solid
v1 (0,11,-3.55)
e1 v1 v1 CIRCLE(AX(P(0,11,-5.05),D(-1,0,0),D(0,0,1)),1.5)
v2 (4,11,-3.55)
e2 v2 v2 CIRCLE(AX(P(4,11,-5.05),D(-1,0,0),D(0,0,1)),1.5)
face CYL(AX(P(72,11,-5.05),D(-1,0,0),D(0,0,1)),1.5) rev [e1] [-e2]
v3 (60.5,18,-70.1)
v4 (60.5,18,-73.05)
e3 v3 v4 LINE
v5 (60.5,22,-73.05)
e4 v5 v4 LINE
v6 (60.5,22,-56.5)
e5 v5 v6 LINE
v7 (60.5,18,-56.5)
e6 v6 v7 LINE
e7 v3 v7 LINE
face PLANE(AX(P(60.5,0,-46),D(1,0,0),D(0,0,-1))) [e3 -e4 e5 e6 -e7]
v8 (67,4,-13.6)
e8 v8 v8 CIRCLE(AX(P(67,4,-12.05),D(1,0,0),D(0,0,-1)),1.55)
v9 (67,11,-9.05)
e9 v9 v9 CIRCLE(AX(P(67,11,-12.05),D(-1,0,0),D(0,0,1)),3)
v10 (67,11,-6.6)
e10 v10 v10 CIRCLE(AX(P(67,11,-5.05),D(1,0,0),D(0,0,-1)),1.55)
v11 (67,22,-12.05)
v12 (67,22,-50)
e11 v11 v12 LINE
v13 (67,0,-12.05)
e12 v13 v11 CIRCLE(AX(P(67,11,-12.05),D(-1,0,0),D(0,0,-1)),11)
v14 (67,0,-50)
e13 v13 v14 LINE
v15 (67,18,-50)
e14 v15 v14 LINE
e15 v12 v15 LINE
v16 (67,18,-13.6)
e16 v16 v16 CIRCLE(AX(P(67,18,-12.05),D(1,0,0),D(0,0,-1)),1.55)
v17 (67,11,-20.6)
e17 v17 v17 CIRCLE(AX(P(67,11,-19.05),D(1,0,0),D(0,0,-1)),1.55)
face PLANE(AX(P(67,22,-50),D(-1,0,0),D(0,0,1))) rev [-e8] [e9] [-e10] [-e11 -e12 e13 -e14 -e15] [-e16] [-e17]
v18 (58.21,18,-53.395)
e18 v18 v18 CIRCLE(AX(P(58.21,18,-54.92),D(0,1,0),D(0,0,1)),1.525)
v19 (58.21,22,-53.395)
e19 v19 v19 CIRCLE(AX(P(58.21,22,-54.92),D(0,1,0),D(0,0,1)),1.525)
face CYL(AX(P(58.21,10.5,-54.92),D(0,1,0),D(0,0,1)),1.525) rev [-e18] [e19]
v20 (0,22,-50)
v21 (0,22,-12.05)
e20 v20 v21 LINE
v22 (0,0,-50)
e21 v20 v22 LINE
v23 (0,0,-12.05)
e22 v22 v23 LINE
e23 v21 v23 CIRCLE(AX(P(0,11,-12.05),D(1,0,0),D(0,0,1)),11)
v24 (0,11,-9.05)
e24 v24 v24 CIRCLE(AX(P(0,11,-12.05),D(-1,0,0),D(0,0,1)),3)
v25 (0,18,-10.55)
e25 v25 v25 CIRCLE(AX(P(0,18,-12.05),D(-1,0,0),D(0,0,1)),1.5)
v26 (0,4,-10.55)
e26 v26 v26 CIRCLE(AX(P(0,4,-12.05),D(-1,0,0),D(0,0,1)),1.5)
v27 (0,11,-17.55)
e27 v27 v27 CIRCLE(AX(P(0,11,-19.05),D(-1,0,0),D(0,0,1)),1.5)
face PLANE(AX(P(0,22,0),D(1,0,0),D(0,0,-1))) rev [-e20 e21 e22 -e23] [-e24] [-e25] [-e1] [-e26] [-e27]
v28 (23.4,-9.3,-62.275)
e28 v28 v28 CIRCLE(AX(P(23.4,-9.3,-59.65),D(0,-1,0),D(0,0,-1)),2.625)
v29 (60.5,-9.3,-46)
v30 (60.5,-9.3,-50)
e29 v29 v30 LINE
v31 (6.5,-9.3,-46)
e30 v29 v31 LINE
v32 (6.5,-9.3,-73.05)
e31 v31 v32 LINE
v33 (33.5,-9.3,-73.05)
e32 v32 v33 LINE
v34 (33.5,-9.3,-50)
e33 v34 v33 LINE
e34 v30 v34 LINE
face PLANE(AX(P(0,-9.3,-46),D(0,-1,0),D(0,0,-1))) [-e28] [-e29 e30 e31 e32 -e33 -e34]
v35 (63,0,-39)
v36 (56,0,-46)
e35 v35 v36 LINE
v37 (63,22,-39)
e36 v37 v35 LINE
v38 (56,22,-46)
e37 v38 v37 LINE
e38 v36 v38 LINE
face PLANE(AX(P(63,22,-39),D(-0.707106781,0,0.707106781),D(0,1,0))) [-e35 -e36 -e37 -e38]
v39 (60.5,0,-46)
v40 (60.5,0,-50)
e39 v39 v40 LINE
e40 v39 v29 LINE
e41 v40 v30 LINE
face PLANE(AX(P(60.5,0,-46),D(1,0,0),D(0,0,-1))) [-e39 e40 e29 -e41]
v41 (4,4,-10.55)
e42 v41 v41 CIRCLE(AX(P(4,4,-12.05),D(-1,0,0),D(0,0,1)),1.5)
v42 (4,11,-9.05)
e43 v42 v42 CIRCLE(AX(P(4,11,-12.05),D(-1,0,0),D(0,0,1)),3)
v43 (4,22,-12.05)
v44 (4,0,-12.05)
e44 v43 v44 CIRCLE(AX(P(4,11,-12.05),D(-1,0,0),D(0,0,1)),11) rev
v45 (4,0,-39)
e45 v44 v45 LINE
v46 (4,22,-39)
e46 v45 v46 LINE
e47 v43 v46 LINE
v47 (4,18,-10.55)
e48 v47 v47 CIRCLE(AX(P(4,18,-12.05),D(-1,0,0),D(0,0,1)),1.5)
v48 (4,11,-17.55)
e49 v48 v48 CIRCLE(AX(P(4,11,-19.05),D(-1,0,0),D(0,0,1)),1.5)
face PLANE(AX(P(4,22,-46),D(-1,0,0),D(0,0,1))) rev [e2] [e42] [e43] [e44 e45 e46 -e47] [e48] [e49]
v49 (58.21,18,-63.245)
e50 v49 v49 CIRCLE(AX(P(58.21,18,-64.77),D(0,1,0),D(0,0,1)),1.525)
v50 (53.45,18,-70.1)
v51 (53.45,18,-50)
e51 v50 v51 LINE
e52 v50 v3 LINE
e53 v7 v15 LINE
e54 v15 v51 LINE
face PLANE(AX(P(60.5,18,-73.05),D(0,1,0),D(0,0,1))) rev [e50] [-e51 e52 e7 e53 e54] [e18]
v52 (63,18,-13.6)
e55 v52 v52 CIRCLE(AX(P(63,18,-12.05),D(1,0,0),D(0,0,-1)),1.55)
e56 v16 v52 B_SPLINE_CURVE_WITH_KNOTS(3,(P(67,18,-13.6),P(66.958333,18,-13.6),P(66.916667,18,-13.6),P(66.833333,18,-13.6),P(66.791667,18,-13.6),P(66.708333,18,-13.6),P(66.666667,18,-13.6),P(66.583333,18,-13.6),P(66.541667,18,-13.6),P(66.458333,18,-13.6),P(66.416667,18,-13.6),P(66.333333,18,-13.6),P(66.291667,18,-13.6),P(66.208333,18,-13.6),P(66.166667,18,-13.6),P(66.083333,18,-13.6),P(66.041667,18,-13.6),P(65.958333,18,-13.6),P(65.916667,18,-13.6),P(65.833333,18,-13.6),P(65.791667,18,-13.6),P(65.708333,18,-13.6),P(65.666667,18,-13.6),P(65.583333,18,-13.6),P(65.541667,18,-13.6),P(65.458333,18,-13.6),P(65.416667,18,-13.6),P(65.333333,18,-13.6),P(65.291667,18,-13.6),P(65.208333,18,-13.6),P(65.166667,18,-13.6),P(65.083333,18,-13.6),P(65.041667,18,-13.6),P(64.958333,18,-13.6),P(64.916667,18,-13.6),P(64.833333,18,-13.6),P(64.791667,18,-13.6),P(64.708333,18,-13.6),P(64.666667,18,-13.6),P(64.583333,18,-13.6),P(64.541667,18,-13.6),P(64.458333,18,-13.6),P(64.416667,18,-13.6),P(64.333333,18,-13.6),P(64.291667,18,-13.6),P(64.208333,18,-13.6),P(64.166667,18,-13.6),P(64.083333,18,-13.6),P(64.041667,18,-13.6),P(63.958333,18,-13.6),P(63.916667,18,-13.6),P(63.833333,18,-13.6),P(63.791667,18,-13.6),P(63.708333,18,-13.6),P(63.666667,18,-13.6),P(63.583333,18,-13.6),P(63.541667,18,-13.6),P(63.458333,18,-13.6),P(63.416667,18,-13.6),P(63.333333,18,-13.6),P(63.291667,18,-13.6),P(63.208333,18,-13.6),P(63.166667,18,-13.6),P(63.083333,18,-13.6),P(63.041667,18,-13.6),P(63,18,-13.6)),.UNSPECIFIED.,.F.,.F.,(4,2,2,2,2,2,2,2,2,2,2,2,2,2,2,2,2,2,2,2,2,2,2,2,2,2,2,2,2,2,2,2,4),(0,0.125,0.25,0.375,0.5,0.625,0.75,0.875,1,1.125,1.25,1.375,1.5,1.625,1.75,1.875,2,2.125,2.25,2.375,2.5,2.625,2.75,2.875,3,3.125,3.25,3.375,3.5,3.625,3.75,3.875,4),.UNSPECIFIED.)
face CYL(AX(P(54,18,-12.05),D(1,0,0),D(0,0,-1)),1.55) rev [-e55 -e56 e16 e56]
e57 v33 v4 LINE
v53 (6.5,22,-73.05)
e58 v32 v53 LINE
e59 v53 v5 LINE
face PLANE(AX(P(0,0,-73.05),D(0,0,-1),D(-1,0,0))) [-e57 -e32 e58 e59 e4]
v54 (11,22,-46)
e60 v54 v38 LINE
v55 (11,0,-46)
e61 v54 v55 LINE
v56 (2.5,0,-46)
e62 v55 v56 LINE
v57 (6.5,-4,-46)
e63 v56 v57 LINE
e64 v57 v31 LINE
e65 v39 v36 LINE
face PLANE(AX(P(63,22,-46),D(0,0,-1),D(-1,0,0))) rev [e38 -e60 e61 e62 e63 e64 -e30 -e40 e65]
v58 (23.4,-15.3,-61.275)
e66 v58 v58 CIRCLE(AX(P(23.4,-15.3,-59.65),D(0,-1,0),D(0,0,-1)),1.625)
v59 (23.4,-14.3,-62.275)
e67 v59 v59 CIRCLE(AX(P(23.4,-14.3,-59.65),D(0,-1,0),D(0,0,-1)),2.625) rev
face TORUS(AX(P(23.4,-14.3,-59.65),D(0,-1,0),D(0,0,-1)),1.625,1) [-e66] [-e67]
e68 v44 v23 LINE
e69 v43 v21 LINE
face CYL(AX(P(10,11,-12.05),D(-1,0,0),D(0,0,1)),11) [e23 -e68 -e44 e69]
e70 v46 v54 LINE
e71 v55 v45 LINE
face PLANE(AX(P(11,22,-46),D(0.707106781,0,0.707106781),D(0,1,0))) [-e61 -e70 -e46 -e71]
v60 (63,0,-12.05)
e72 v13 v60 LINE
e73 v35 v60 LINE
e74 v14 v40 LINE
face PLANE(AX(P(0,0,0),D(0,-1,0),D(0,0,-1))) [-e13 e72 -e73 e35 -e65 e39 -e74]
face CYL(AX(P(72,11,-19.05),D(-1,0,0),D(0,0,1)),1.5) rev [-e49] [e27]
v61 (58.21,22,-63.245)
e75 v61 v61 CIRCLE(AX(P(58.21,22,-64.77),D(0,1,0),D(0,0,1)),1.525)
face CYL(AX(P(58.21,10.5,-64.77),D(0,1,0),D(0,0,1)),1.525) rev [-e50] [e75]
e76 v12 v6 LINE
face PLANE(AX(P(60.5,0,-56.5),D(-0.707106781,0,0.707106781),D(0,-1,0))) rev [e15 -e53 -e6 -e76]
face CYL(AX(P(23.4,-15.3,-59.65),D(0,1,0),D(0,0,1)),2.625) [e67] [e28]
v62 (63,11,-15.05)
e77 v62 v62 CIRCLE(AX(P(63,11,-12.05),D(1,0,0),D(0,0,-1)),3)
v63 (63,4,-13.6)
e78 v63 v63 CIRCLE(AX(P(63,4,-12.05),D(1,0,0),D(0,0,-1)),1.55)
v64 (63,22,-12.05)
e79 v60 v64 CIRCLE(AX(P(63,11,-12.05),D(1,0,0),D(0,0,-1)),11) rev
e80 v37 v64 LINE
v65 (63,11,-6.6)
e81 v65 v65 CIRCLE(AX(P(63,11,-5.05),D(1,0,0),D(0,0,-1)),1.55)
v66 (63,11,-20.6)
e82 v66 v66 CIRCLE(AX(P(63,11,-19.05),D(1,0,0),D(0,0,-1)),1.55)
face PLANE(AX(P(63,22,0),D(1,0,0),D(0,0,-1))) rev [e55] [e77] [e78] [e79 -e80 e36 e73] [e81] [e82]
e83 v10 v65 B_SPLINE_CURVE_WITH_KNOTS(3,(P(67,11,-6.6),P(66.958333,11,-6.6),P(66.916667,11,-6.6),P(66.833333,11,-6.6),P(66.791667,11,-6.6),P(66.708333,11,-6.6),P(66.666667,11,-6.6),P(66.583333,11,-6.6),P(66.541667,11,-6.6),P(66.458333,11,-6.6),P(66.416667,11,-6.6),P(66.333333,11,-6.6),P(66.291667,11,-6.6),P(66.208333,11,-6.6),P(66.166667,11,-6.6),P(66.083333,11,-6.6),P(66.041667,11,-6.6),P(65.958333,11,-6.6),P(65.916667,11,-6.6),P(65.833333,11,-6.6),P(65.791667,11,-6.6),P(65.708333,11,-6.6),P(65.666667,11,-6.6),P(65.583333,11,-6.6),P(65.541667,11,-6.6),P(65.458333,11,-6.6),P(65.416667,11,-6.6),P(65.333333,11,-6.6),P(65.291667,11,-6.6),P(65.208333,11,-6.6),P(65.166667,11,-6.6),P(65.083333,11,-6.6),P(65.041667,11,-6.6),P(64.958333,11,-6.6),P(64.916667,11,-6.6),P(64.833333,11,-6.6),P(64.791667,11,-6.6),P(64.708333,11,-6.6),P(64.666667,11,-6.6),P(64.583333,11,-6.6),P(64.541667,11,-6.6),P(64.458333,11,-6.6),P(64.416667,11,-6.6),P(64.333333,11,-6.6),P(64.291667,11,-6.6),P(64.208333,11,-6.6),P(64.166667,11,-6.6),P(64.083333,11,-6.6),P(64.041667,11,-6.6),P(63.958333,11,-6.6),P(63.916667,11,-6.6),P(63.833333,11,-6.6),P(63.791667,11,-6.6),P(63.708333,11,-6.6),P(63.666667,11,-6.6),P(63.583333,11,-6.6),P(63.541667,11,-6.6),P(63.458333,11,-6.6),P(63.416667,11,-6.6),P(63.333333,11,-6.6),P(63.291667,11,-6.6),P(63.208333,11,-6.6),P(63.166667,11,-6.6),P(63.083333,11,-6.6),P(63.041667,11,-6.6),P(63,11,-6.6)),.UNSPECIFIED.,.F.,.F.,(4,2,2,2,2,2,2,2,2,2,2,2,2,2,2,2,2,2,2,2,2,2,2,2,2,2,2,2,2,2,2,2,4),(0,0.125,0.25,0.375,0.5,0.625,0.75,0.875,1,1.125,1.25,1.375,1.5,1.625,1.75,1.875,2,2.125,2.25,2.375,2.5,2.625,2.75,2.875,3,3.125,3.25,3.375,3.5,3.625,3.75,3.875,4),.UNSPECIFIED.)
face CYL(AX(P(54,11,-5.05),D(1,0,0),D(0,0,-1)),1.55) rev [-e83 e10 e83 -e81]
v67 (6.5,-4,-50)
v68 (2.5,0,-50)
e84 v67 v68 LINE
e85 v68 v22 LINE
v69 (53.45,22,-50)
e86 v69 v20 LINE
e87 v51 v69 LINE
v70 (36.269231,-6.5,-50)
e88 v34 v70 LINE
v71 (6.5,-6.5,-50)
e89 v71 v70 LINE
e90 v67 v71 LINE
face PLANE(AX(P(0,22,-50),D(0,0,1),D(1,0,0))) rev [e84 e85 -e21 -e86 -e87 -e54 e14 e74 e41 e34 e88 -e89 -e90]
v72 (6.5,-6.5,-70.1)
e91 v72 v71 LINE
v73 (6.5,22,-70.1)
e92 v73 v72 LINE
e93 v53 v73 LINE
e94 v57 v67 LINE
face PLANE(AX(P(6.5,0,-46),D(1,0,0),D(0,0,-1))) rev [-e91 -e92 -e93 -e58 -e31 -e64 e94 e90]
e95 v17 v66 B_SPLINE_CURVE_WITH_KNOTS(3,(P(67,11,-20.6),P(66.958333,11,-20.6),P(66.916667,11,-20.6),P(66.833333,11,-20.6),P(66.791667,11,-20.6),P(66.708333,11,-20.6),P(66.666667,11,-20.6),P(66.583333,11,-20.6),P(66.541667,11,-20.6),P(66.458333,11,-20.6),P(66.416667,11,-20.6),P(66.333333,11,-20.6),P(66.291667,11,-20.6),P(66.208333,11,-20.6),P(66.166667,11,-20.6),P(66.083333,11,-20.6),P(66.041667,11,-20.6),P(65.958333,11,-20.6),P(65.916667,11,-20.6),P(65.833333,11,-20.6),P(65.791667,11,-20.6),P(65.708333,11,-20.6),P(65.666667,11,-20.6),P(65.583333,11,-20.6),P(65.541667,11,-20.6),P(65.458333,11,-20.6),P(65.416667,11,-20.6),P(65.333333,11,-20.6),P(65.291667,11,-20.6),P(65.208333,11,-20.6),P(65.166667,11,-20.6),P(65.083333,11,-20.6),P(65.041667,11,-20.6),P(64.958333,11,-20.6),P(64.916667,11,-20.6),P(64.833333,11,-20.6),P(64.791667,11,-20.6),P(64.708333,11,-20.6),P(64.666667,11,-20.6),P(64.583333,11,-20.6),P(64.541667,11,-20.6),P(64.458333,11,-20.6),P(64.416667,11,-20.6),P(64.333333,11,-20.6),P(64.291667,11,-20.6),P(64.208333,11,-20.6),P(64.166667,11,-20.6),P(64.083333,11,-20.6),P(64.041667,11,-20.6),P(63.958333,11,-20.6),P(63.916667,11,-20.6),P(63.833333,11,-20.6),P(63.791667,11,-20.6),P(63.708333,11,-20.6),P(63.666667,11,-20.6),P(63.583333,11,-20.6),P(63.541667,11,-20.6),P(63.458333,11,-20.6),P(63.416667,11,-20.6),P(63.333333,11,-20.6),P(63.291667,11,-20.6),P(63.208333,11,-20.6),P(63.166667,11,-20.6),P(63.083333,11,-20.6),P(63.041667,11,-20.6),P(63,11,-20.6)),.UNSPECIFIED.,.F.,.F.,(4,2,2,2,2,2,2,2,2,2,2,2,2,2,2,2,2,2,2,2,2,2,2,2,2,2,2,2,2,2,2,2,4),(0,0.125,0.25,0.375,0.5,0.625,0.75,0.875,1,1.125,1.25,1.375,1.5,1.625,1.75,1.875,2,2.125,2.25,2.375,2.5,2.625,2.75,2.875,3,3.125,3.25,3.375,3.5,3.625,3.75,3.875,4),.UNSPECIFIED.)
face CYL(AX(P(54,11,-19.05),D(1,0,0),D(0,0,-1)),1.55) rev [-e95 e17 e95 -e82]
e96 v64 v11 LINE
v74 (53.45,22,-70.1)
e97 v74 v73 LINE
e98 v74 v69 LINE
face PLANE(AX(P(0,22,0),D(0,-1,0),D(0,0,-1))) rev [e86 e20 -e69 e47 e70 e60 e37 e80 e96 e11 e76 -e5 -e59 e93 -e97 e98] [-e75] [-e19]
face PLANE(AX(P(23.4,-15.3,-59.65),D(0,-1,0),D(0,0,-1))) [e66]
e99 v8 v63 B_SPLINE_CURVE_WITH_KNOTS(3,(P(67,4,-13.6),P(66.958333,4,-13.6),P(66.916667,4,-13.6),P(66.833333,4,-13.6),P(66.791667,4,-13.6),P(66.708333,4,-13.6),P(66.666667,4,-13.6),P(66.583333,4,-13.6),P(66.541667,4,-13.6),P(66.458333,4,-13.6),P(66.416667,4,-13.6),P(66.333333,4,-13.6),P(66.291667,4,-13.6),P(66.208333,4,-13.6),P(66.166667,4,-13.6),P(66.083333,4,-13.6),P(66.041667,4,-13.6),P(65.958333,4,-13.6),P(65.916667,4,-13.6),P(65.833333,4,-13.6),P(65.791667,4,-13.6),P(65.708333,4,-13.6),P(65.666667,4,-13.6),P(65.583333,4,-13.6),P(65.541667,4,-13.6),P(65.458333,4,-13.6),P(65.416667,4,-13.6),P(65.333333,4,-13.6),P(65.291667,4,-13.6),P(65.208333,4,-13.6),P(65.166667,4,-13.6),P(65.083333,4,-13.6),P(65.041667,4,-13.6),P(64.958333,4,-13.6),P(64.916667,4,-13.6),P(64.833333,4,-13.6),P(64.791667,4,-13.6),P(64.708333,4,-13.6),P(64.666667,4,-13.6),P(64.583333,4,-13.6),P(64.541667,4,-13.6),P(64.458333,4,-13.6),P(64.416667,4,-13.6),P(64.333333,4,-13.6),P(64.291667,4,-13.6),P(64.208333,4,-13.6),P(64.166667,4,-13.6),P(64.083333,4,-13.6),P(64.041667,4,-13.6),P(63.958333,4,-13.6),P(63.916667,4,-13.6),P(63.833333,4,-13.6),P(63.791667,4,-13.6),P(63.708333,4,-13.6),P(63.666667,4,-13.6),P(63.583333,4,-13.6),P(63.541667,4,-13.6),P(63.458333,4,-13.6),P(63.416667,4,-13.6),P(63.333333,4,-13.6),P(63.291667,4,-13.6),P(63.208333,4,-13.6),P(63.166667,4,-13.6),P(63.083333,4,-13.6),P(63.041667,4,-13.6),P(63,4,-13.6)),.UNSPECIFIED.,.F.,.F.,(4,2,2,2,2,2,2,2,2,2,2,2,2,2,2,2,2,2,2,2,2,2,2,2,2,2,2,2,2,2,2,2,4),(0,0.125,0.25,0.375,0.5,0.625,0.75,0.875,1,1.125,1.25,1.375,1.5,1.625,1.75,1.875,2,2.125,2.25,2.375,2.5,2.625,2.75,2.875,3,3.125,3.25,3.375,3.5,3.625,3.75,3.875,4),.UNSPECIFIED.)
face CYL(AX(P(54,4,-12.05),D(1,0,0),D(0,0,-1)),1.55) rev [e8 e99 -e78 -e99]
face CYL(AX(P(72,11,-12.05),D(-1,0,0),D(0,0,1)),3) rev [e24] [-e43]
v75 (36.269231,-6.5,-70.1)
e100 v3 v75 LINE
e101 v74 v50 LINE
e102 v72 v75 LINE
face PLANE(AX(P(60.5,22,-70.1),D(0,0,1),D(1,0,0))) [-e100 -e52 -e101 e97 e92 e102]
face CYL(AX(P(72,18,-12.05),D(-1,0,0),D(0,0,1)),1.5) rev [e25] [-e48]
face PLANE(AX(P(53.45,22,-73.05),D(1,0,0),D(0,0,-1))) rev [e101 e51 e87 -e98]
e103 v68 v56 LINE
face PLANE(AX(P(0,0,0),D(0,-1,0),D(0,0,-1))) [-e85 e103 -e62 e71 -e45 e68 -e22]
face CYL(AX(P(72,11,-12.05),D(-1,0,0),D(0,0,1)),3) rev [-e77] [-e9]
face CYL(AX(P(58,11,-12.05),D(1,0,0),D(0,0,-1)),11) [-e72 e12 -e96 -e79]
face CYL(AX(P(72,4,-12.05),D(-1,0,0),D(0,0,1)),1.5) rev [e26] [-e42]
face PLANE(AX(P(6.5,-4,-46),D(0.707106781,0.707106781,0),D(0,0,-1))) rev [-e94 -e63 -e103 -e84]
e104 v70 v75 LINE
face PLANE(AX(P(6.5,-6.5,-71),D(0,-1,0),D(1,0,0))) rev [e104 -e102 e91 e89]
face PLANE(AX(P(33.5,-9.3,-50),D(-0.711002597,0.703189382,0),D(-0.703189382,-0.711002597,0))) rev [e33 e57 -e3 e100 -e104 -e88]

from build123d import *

# Parameters (mm, degrees)
BOSS_EXTRUDE1_DEPTH      = 22
SKETCH3_R                = 1.55
CUT_EXTRUDE1_DEPTH       = 30
CUT_EXTRUDE5_DEPTH       = 9
SKETCH11_R               = 1.55
CUT_EXTRUDE10_DEPTH      = 13
CUT_EXTRUDE11_START      = -10
CUT_EXTRUDE11_DEPTH      = 10
SKETCH13_R               = 3
SKETCH13_R_2             = 1.5
CUT_EXTRUDE12_DEPTH      = 72
FILLET1_SIZE             = 7
SKETCH14_W               = 54
SKETCH14_H               = 9.3
SKETCH14_W_2             = 7.05
SKETCH14_H_2             = 4
BOSS_EXTRUDE4_DEPTH      = 4
SKETCH17_W               = 7.05
SKETCH17_H               = 4
BOSS_EXTRUDE5_DEPTH      = 23.05
BOSS_EXTRUDE6_DEPTH      = 27.3
BOSS_EXTRUDE6_DEPTH_BACK = 4
SKETCH18_W               = 54
SKETCH18_H               = 2.95
SKETCH19_W               = 54
SKETCH19_H               = 2.8
BOSS_EXTRUDE7_DEPTH      = 21
FILLET2_SIZE             = 6.5
SKETCH20_R               = 2.625
BOSS_EXTRUDE8_DEPTH      = 6
FILLET4_R                = 1
CUT_EXTRUDE15_DEPTH      = 23.05
SKETCH23_W               = 18.360798368
SKETCH23_H               = 20.1
CUT_EXTRUDE16_DEPTH      = 23
FILLET7_SIZE             = 4
SKETCH26_R               = 1.525
CUT_EXTRUDE18_DEPTH      = 11.5


with BuildPart() as part:
    # Sketch1 → Boss-Extrude1 (new body)
    with BuildSketch(Plane(origin=(0, 0, 0), x_dir=(1, 0, 0), z_dir=(0, 1, 0))):
        Polygon((0, 0), (0, 50), (67, 50), (67, 0), (63, 0), (63, 46), (4, 46), (4, 0), align=None)
    extrude(amount=BOSS_EXTRUDE1_DEPTH)

    # Sketch3 → Cut-Extrude1 (cut)
    with BuildSketch(Plane(origin=(67, 0, 0), x_dir=(0, 0, -1), z_dir=(1, 0, 0))):
        with Locations((12.05, 11)):
            Circle(SKETCH3_R)
    extrude(amount=-CUT_EXTRUDE1_DEPTH, mode=Mode.SUBTRACT)

    # Sketch5 → Cut-Extrude5 (cut)
    with BuildSketch(Plane(origin=(67, 0, 0), x_dir=(0, 0, -1), z_dir=(1, 0, 0))):
        with BuildLine():
            Line((12.05, 22), (0, 22))
            Line((0, 22), (0, 0))
            Line((0, 0), (12.05, 0))
            ThreePointArc((12.05, 0), (1.05, 11), (12.05, 22))
        make_face()
    extrude(amount=-CUT_EXTRUDE5_DEPTH, mode=Mode.SUBTRACT)

    # Sketch11 → Cut-Extrude10 (cut)
    with BuildSketch(Plane(origin=(67, 0, 0), x_dir=(0, 0, -1), z_dir=(1, 0, 0))):
        with Locations((19.05, 11)):
            Circle(SKETCH11_R)
        with Locations((12.05, 18)):
            Circle(SKETCH11_R)
        with Locations((12.05, 4)):
            Circle(SKETCH11_R)
        with Locations((5.05, 11)):
            Circle(SKETCH11_R)
    extrude(amount=-CUT_EXTRUDE10_DEPTH, mode=Mode.SUBTRACT)

    # Sketch12 → Cut-Extrude11 (cut)
    with BuildSketch(Plane.ZY.offset(CUT_EXTRUDE11_START)):
        with BuildLine():
            Line((-12.05, 22), (0, 22))
            Line((0, 22), (0, 0))
            Line((0, 0), (-12.05, 0))
            ThreePointArc((-12.05, 0), (-1.05, 11), (-12.05, 22))
        make_face()
    extrude(amount=CUT_EXTRUDE11_DEPTH, mode=Mode.SUBTRACT)

    # Sketch13 → Cut-Extrude12 (cut)
    with BuildSketch(Plane.ZY):
        with Locations((-12.05, 11)):
            Circle(SKETCH13_R)
        with Locations((-19.05, 11)):
            Circle(SKETCH13_R_2)
        with Locations((-12.05, 4)):
            Circle(SKETCH13_R_2)
        with Locations((-5.05, 11)):
            Circle(SKETCH13_R_2)
        with Locations((-12.05, 18)):
            Circle(SKETCH13_R_2)
    extrude(amount=-CUT_EXTRUDE12_DEPTH, mode=Mode.SUBTRACT)

    # Fillet1
    fillet1_edges = [part.edges().sort_by_distance(p)[0] for p in [
        (63, 11, -46),
        (4, 11, -46),
    ]]
    chamfer(fillet1_edges, length=FILLET1_SIZE)

    # Sketch14 → Boss-Extrude4 (add)
    with BuildSketch(Plane(origin=(0, 0, -50), x_dir=(-1, 0, 0), z_dir=(0, 0, -1))):
        with Locations((-33.5, -4.65)):
            Rectangle(SKETCH14_W, SKETCH14_H)
        with Locations((-56.975, 20)):
            Rectangle(SKETCH14_W_2, SKETCH14_H_2)
        with Locations((-10.025, 20)):
            Rectangle(SKETCH14_W_2, SKETCH14_H_2)
    extrude(amount=-BOSS_EXTRUDE4_DEPTH)

    # Sketch17 → Boss-Extrude5 (add)
    with BuildSketch(Plane(origin=(0, 0, -50), x_dir=(-1, 0, 0), z_dir=(0, 0, -1))):
        with Locations((-56.975, 20)):
            Rectangle(SKETCH17_W, SKETCH17_H)
        with Locations((-10.025, 20)):
            Rectangle(SKETCH17_W, SKETCH17_H)
    extrude(amount=BOSS_EXTRUDE5_DEPTH)

    # Sketch18 → Boss-Extrude6 (add, two sides: drawn at the far end of the back side and taken through both)
    with BuildSketch(Plane.XZ.offset(-18).offset(-BOSS_EXTRUDE6_DEPTH_BACK)):
        with Locations((33.5, -71.575)):
            Rectangle(SKETCH18_W, SKETCH18_H)
    extrude(amount=BOSS_EXTRUDE6_DEPTH + BOSS_EXTRUDE6_DEPTH_BACK)

    # Sketch19 → Boss-Extrude7 (add)
    with BuildSketch(Plane(origin=(0, 0, -50), x_dir=(-1, 0, 0), z_dir=(0, 0, -1))):
        with Locations((-33.5, -7.9)):
            Rectangle(SKETCH19_W, SKETCH19_H)
    extrude(amount=BOSS_EXTRUDE7_DEPTH)

    # Fillet2
    fillet2_edges = [part.edges().sort_by_distance(p)[0] for p in [
        (60.5, 20, -50),
        (6.5, 20, -50),
    ]]
    chamfer(fillet2_edges, length=FILLET2_SIZE - 0.0001)  # a hair under: the kernel refuses the full size

    # Sketch20 → Boss-Extrude8 (add)
    with BuildSketch(Plane.XZ.offset(9.3)):
        with Locations(Location((23.4, -59.65, 0), (0, 0, 270))):
            Circle(SKETCH20_R)
    extrude(amount=BOSS_EXTRUDE8_DEPTH)

    # Fillet4
    fillet4_edges = [part.edges().sort_by_distance(p)[0] for p in [
        (23.4, -15.3, -57.025),
    ]]
    fillet(fillet4_edges, radius=FILLET4_R)

    # Sketch22 → Cut-Extrude15 (cut)
    with BuildSketch(Plane(origin=(0, 0, -73.05), x_dir=(-1, 0, 0), z_dir=(0, 0, -1))):
        Polygon((-60.5, -9.3), (-33.5, -9.3), (-60.5, 18), align=None)
    extrude(amount=-CUT_EXTRUDE15_DEPTH, mode=Mode.SUBTRACT)

    # Sketch23 → Cut-Extrude16 (cut)
    with BuildSketch(Plane(origin=(0, 22, 0), x_dir=(1, 0, 0), z_dir=(0, 1, 0))):
        with Locations((4.369600816, 60.05)):
            Rectangle(SKETCH23_W, SKETCH23_H)
    extrude(amount=-CUT_EXTRUDE16_DEPTH, mode=Mode.SUBTRACT)

    # Fillet7
    fillet7_edges = [part.edges().sort_by_distance(p)[0] for p in [
        (6.5, 0, -48),
    ]]
    chamfer(fillet7_edges, length=FILLET7_SIZE)

    # Sketch26 → Cut-Extrude18 (cut)
    with BuildSketch(Plane(origin=(0, 22, 0), x_dir=(1, 0, 0), z_dir=(0, 1, 0))):
        with Locations(Location((58.21, 64.77, 0), (0, 0, 270))):
            Circle(SKETCH26_R)
        with Locations(Location((58.21, 54.92, 0), (0, 0, 270))):
            Circle(SKETCH26_R)
    extrude(amount=-CUT_EXTRUDE18_DEPTH, mode=Mode.SUBTRACT)


solid = part.part
